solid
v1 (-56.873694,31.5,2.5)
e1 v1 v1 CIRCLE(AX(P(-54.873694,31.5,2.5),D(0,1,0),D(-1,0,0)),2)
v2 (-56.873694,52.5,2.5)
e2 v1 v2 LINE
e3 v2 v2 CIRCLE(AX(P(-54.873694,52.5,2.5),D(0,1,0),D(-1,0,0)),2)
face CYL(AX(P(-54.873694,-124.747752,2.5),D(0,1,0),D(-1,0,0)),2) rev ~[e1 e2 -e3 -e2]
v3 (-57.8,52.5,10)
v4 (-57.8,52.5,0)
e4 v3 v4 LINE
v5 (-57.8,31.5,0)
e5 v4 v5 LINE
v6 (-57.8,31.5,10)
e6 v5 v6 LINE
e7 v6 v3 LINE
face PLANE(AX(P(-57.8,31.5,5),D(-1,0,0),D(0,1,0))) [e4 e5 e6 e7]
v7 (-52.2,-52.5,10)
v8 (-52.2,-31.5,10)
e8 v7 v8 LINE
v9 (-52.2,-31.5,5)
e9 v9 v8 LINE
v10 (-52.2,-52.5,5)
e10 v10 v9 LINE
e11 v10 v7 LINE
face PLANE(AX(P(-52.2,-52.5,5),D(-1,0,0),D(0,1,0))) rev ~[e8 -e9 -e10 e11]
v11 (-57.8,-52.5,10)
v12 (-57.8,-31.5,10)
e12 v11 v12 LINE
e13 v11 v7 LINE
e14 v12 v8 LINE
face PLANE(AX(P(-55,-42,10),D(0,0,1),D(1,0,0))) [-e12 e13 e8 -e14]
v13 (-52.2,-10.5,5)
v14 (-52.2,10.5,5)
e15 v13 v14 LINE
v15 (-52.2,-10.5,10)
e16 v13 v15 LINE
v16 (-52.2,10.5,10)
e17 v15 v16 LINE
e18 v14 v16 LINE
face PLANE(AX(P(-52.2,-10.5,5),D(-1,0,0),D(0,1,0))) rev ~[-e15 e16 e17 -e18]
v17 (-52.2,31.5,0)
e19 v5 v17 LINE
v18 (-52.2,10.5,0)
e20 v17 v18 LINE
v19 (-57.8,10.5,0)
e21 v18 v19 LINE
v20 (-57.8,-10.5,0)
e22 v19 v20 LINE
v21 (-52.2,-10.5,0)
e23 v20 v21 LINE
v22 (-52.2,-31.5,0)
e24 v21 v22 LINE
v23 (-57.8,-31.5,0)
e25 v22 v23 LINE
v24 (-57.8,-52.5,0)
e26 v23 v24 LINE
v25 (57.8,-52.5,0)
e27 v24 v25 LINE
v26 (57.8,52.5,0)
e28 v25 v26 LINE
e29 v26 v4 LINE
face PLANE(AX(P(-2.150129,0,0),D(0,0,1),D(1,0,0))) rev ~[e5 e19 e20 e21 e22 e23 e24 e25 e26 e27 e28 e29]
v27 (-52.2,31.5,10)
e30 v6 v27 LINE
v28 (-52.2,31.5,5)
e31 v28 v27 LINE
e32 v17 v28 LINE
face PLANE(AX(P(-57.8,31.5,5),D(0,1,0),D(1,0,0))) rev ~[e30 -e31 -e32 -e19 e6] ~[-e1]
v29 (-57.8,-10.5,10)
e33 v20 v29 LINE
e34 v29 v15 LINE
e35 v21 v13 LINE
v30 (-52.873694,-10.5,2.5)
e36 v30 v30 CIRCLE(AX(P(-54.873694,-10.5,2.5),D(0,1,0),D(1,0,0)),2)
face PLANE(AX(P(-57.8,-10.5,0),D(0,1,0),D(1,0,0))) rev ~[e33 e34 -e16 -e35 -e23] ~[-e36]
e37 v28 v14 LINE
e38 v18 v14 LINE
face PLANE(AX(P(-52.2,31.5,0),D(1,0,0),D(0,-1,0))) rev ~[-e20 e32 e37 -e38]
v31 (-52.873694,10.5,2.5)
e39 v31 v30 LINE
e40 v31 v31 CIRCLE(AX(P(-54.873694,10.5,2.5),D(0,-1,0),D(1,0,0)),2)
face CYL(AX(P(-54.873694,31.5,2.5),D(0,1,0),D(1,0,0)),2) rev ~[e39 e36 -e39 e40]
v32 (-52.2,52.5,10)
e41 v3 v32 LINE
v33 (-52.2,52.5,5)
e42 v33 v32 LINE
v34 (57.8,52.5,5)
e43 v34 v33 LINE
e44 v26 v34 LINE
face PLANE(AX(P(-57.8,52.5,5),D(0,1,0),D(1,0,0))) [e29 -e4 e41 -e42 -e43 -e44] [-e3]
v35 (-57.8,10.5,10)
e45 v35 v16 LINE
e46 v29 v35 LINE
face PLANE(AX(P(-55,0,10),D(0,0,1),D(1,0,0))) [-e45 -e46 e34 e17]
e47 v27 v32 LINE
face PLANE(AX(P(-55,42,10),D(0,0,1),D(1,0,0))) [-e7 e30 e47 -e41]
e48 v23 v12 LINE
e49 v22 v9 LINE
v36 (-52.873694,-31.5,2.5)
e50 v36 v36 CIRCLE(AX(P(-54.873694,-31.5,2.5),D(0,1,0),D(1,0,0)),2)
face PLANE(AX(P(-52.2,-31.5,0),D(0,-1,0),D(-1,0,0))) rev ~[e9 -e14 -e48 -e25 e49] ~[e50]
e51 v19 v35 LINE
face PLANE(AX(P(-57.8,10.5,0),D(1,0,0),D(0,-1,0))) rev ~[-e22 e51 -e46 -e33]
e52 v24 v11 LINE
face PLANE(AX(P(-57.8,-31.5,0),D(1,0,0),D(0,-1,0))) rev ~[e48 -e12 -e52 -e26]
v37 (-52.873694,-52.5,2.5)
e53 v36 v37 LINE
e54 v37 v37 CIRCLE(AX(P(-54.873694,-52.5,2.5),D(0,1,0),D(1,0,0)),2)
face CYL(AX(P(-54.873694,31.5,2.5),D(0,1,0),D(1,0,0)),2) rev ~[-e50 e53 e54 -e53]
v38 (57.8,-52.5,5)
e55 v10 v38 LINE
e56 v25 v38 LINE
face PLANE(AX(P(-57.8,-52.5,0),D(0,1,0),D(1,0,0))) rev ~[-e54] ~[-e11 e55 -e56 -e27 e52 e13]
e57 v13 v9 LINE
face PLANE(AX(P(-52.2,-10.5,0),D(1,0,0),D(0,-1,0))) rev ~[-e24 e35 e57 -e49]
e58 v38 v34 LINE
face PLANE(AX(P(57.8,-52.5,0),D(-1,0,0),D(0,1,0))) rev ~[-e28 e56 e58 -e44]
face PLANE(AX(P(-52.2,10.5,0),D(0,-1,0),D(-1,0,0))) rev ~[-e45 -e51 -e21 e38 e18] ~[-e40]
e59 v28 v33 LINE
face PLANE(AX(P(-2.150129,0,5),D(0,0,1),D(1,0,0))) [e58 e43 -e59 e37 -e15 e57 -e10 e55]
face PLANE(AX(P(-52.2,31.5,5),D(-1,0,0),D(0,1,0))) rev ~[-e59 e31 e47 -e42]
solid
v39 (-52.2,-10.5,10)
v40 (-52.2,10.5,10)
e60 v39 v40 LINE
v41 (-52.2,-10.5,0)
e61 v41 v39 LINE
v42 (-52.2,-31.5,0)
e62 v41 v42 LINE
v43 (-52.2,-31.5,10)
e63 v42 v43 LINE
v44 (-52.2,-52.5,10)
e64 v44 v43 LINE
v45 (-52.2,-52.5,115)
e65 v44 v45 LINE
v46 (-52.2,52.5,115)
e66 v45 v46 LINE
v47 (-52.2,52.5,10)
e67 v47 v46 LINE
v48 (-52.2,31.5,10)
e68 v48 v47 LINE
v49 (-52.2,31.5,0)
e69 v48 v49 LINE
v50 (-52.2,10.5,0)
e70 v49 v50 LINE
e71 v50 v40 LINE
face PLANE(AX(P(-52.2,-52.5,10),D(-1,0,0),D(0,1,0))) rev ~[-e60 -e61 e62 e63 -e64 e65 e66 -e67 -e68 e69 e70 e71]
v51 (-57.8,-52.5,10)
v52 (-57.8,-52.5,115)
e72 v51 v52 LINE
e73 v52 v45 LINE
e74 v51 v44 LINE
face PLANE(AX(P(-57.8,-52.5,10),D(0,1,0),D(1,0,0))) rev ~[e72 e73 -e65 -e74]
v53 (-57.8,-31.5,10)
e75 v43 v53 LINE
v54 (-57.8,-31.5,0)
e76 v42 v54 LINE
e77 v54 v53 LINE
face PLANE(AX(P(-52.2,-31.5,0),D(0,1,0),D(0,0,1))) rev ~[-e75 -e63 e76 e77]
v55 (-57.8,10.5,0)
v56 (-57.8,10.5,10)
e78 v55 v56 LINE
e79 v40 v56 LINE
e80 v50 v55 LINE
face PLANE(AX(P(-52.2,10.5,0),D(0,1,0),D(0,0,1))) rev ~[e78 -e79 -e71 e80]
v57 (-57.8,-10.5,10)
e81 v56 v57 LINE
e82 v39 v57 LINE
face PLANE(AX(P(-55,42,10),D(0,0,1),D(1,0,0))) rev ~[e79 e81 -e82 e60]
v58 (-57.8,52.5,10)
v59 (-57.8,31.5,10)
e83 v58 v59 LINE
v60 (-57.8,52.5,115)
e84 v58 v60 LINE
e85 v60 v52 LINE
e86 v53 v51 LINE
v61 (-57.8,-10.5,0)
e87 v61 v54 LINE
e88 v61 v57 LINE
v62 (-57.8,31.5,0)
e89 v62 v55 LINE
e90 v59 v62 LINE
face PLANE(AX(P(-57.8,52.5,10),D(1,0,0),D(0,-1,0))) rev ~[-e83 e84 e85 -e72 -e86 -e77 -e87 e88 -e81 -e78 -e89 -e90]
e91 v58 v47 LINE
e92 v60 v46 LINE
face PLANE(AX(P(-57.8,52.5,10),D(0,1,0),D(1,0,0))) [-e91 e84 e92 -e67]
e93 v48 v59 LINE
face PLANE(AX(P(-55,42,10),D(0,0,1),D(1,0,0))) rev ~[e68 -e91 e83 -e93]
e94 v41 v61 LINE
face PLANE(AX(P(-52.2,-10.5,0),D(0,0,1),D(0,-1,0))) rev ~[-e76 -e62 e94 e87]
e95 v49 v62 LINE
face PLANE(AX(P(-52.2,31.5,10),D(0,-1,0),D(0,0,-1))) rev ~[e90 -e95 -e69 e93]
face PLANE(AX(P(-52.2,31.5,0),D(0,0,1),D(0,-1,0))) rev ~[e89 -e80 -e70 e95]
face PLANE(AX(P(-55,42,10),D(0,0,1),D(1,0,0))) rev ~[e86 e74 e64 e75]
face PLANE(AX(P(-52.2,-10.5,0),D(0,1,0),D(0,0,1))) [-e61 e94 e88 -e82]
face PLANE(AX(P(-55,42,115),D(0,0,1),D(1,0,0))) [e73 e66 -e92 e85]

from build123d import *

# Parameters (mm, degrees)
F1_DEPTH  = 5
F3_D      = 4
F3_DEPTH  = 84.001
F4_D      = 4
F5_W      = 5.6
F5_H      = 21
F6_DEPTH  = 5
F7_W      = 21
F7_H      = 5
F8_DEPTH  = 5.6
F7_H_2    = 10
F9_W      = 5.6
F9_H      = 21
F10_DEPTH = 105


with BuildPart() as f1:
    # F0 (on Top) → F1 (new body)
    with BuildSketch(Plane.XY):
        Polygon((57.8, -52.5), (57.8, 52.5), (-57.8, 52.5), (-57.8, 31.5), (-52.2, 31.5), (-52.2, 10.5), (-57.8, 10.5), (-57.8, -10.5), (-52.2, -10.5), (-52.2, -31.5), (-57.8, -31.5), (-57.8, -52.5), align=None)
    extrude(amount=F1_DEPTH)

    # F3 (through all, one way)
    with BuildSketch(Plane(origin=(0, 31.5, 0), x_dir=(1, 0, 0), z_dir=(0, 1, 0))):
        with Locations((-54.8736937344, -2.5)):
            Circle(F3_D / 2)
    extrude(amount=-F3_DEPTH, mode=Mode.SUBTRACT)

    # F4 (through all)
    with Locations(Plane.XZ.offset(-31.5)):
        with Locations((-54.8736937344, 2.5)):
            Hole(F4_D / 2)

    # F5 (on face) → F6 (join)
    with BuildSketch(Plane.XY.offset(5)):
        with Locations((-55, 42)):
            Rectangle(F5_W, F5_H)
        with Locations((-55, 0)):
            Rectangle(F5_W, F5_H)
        with Locations((-55, -42)):
            Rectangle(F5_W, F5_H)
    extrude(amount=F6_DEPTH)


with BuildPart() as f8:
    # F7 (on face) → F8 (new body)
    with BuildSketch(Plane(origin=(-52.2, 0, 0), x_dir=(0, -1, 0), z_dir=(-1, 0, 0))):
        with Locations((-21, 7.5)):
            Rectangle(F7_W, F7_H)
        with Locations((-21, 2.5)):
            Rectangle(F7_W, F7_H)
    extrude(amount=F8_DEPTH)



with BuildPart() as f8b:
    # F7 (on face) → F8, piece 2 (new body)
    with BuildSketch(Plane(origin=(-52.2, 0, 0), x_dir=(0, -1, 0), z_dir=(-1, 0, 0))):
        with Locations((21, 5)):
            Rectangle(F7_W, F7_H_2)
    extrude(amount=F8_DEPTH)


with BuildPart() as f8_1:
    add(f8.part)

    add(f8b.part)  # F10 merges F8b
    # F9 (on face) → F10 (join)
    with BuildSketch(Plane.XY.offset(10)):
        with Locations((-55, 42)):
            Rectangle(F9_W, F9_H)
        Polygon((-57.8, 31.5), (-57.8, -31.5), (-57.8, -52.5), (-52.2, -52.5), (-52.2, 31.5), align=None)
    extrude(amount=F10_DEPTH)


solid = Compound([f1.part, f8_1.part])
